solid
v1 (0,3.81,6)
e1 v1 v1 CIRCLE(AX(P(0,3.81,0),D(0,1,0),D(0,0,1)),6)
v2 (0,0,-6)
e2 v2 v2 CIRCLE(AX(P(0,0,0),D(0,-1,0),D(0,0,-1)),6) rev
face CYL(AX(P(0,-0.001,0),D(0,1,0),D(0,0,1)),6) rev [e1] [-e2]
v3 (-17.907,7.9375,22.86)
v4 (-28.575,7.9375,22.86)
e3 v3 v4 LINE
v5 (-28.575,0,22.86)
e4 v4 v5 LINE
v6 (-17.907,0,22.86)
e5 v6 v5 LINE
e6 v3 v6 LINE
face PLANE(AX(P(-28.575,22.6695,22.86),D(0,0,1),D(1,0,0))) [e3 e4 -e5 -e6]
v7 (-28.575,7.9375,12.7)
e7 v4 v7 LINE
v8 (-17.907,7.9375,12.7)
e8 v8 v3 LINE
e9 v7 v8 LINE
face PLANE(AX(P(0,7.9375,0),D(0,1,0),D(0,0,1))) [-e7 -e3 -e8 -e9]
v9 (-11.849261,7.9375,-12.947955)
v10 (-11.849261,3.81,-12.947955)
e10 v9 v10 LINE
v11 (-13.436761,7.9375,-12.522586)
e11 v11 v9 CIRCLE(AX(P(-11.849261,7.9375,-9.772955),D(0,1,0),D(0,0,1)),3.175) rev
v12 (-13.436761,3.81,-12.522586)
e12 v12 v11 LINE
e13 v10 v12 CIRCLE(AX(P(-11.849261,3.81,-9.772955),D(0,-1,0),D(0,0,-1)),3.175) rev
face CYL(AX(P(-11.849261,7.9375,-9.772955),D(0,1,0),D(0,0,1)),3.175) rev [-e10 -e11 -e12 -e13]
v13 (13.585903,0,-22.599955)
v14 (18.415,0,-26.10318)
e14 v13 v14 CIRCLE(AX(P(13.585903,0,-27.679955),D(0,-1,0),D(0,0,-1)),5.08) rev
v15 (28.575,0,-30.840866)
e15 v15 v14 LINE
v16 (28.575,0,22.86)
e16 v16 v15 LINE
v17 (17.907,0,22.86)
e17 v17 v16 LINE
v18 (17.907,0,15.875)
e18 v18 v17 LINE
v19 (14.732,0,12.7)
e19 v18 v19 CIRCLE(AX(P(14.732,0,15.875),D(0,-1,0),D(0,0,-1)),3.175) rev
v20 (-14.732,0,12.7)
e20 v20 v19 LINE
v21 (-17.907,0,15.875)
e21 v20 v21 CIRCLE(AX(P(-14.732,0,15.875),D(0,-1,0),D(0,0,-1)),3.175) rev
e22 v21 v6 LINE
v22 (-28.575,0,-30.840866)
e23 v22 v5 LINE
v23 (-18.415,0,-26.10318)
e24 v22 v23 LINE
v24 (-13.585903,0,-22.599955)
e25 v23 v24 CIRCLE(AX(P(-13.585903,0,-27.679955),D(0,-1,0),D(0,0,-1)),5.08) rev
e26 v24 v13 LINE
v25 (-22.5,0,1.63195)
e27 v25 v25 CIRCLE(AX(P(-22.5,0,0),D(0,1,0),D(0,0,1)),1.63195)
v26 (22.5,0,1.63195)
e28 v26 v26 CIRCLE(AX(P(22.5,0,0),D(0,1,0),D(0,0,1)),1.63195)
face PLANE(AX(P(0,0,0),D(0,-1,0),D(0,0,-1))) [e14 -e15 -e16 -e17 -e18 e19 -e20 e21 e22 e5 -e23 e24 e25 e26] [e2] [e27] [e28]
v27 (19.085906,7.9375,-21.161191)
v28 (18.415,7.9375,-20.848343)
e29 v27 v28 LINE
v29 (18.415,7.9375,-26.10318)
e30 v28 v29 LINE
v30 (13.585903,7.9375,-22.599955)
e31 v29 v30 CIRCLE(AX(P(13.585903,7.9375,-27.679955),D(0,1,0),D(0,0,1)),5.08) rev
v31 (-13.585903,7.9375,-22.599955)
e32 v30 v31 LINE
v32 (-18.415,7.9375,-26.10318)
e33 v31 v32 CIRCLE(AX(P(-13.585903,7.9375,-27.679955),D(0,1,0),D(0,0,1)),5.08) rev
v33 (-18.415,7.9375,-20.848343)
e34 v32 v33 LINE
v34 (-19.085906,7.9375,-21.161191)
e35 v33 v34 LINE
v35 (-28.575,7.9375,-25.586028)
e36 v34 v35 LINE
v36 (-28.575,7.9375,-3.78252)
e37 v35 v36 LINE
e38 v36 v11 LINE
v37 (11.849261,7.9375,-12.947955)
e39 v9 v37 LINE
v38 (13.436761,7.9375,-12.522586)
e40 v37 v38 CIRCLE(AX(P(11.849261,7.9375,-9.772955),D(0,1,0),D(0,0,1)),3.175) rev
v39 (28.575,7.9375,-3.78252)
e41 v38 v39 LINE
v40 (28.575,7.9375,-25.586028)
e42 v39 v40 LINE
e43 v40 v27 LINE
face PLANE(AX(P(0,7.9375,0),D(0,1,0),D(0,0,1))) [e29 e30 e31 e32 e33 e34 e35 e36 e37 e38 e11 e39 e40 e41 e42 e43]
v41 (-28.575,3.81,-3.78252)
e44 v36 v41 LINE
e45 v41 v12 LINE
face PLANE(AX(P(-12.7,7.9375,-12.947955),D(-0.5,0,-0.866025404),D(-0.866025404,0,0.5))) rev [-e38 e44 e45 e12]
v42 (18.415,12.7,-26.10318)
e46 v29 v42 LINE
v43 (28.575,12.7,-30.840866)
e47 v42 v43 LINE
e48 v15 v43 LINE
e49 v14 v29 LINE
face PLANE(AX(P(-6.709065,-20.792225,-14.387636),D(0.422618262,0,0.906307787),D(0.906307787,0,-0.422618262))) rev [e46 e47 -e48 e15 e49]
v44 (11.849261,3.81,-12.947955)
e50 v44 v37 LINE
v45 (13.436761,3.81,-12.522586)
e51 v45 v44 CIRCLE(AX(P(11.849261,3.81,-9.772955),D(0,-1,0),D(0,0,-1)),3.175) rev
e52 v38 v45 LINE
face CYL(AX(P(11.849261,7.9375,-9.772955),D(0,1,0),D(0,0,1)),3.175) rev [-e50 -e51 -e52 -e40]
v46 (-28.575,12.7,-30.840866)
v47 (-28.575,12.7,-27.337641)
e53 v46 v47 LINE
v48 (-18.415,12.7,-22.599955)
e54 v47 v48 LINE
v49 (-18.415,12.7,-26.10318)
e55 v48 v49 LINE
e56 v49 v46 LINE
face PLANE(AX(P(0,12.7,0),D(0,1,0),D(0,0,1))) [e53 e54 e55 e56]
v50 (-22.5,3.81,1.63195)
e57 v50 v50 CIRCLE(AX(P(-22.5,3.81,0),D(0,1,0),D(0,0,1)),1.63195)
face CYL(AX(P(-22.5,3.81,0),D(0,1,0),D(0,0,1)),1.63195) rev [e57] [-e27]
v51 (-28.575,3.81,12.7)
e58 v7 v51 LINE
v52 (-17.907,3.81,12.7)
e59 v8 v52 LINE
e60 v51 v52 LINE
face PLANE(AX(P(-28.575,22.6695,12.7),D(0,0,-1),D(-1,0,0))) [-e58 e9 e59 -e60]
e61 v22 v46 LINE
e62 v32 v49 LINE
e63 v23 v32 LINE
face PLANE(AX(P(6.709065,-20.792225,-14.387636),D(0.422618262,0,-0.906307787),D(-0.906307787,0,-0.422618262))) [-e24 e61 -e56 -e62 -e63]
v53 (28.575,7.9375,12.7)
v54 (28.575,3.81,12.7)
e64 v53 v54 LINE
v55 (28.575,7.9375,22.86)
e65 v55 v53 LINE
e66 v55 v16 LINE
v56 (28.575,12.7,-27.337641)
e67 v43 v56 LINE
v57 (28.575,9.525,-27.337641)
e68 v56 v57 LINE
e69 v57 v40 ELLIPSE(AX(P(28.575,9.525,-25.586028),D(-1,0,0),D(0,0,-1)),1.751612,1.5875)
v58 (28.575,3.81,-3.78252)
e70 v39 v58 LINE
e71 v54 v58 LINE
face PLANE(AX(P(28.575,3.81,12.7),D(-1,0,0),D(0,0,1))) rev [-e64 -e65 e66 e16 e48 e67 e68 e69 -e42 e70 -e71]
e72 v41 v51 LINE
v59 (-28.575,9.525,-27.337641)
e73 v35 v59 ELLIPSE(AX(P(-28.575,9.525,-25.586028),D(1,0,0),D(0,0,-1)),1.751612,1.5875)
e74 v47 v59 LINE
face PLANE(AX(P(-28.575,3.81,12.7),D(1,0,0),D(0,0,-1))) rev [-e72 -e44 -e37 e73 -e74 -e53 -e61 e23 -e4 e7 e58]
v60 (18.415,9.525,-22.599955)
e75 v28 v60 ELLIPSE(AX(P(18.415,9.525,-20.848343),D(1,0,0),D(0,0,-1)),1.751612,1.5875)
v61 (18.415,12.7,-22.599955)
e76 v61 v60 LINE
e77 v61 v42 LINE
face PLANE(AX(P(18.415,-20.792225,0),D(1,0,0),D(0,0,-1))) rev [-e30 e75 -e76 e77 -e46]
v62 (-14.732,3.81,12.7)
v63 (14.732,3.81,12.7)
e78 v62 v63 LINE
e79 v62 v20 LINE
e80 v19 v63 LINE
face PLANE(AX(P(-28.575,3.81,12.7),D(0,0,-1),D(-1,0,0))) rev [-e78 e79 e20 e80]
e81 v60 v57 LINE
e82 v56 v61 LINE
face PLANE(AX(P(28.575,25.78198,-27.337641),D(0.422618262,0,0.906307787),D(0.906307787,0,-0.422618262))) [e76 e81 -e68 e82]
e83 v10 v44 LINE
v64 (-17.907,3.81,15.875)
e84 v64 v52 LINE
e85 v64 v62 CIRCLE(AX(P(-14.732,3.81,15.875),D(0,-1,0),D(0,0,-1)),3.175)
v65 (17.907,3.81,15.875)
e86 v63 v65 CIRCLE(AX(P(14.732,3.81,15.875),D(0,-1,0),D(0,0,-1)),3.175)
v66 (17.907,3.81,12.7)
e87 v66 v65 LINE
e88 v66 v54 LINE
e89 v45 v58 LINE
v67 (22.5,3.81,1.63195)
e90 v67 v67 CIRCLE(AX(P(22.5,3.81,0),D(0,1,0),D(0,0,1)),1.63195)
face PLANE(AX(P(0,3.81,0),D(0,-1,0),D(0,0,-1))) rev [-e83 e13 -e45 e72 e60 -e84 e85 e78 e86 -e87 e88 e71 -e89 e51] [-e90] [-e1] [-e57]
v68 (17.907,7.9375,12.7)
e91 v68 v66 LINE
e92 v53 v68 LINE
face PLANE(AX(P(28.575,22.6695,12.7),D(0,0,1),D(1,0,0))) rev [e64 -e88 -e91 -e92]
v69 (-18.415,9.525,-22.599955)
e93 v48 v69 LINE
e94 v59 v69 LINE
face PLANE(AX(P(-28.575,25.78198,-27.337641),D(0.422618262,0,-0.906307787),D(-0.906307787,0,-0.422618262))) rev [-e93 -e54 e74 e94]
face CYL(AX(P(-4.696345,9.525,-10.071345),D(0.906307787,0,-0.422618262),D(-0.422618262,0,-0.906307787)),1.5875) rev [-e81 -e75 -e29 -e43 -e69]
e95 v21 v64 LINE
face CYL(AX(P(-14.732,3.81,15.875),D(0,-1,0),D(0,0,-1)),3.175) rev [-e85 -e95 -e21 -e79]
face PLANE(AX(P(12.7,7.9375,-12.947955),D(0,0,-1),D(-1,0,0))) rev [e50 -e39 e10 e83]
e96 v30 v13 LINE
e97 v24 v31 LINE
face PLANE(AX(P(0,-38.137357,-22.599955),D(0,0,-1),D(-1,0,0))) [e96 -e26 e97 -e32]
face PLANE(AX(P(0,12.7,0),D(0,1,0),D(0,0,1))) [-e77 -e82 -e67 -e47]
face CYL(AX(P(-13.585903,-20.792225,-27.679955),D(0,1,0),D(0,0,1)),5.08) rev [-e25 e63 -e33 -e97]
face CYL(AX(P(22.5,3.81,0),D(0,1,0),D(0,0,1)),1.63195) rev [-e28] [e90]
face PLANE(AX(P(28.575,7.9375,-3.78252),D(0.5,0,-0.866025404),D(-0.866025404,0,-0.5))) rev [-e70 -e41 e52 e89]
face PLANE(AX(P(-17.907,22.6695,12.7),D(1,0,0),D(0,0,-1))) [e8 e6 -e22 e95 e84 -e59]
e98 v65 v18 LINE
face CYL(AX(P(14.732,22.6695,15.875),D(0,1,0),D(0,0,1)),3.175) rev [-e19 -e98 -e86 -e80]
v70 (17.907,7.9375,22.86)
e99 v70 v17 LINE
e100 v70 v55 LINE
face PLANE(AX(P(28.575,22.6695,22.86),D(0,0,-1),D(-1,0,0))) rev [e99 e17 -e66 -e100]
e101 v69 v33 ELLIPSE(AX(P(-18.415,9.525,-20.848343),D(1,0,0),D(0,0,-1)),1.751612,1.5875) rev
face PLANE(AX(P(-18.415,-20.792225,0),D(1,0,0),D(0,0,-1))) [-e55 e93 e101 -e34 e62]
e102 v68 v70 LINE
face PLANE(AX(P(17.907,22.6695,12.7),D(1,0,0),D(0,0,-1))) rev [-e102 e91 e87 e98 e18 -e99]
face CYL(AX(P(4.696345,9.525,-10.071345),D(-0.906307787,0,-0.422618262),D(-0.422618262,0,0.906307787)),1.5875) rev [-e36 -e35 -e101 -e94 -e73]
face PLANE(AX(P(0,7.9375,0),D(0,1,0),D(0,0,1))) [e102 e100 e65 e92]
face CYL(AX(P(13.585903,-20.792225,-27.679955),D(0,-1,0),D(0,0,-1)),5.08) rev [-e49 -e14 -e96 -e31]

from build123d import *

# Parameters (mm, degrees)
SKETCH1_W             = 57.15
SKETCH1_H             = 25.4
BOSS_EXTRUDE1_DEPTH   = 3.81
CUT_EXTRUDE1_REACH    = 33.501
SKETCH2_R             = 6
F_4_CLEARANCE_HOLE1_D = 3.2639
BOSS_EXTRUDE4_DEPTH   = 3.81
BOSS_EXTRUDE5_DEPTH   = 8.89
SKETCH12_W            = 36.83
SKETCH12_H            = 9.899955096
BOSS_EXTRUDE6_DEPTH   = 3.81
BOSS_EXTRUDE7_DEPTH   = 4.1275
FILLET4_R             = 3.175
FILLET5_R             = 1.5875
BOSS_EXTRUDE8_REACH   = 45.92
SKETCH14_W            = 10.668
SKETCH14_H            = 10.16
FILLET6_R             = 3.175
FILLET7_R             = 5.08


with BuildPart() as part:
    # Sketch1 → Boss-Extrude1 (new body)
    with BuildSketch(Plane(origin=(0, 0, 0), x_dir=(1, 0, 0), z_dir=(0, 1, 0))):
        Rectangle(SKETCH1_W, SKETCH1_H)
    extrude(amount=BOSS_EXTRUDE1_DEPTH)

    # Sketch2 → Cut-Extrude1 (cut, up to next)
    with BuildSketch(Plane(origin=(0, 3.81, 0), x_dir=(1, 0, 0), z_dir=(0, 1, 0)), mode=Mode.PRIVATE) as cut_extrude1_sk1:
        with Locations(Location((0, 0, 0), (0, 0, 270))):
            Circle(SKETCH2_R)
    cut_extrude1_tool1 = extrude(cut_extrude1_sk1.sketch, amount=-CUT_EXTRUDE1_REACH, mode=Mode.PRIVATE) & part.part
    add(cut_extrude1_tool1.solids().sort_by_distance((0, 3.81, 0))[0], mode=Mode.SUBTRACT)

    # #4 Clearance Hole1 (through all)
    with Locations(Plane(origin=(0, 3.81, 0), x_dir=(1, 0, 0), z_dir=(0, 1, 0))):
        with Locations((-22.5, 0), (22.5, 0)):
            Hole(F_4_CLEARANCE_HOLE1_D / 2)

    # Sketch8 → Boss-Extrude4 (add)
    with BuildSketch(Plane(origin=(0, 3.81, 0), x_dir=(1, 0, 0), z_dir=(0, 1, 0))):
        Polygon((-28.575, 30.840865795), (-28.575, 12.7), (-18.415, 12.7), (-18.415, 26.103179988), align=None)
    boss_extrude4 = extrude(amount=-BOSS_EXTRUDE4_DEPTH)

    # Mirror4: Boss-Extrude4 across plane
    add(boss_extrude4.mirror(Plane(origin=(0, 0, 0), x_dir=(0, 0, 1), z_dir=(1, 0, 0))))

    # Sketch11 → Boss-Extrude5 (add)
    with BuildSketch(Plane(origin=(0, 3.81, 0), x_dir=(1, 0, 0), z_dir=(0, 1, 0))):
        Polygon((-18.415, 26.103179988), (-28.575, 30.840865795), (-28.575, 27.337640903), (-18.415, 22.599955096), align=None)
    boss_extrude5 = extrude(amount=BOSS_EXTRUDE5_DEPTH)

    # Mirror7: Boss-Extrude5 across plane
    add(boss_extrude5.mirror(Plane(origin=(0, 0, 0), x_dir=(0, 0, 1), z_dir=(1, 0, 0))))

    # Sketch12 → Boss-Extrude6 (add)
    with BuildSketch(Plane(origin=(0, 3.81, 0), x_dir=(1, 0, 0), z_dir=(0, 1, 0))):
        with Locations((0, 17.649977548)):
            Rectangle(SKETCH12_W, SKETCH12_H)
    extrude(amount=-BOSS_EXTRUDE6_DEPTH)

    # Sketch13 → Boss-Extrude7 (add)
    with BuildSketch(Plane(origin=(0, 3.81, 0), x_dir=(1, 0, 0), z_dir=(0, 1, 0))):
        Polygon((12.7, 12.947955096), (-12.7, 12.947955096), (-28.575, 3.782519572), (-28.575, 27.337640903), (-18.415, 22.599955096), (18.415, 22.599955096), (28.575, 27.337640903), (28.575, 3.782519572), align=None)
    extrude(amount=BOSS_EXTRUDE7_DEPTH)

    # Fillet4
    fillet4_edges = [part.edges().sort_by_distance(p)[0] for p in [
        (-12.7, 5.87375, -12.947955096),
        (12.7, 5.87375, -12.947955096),
    ]]
    fillet(fillet4_edges, radius=FILLET4_R)

    # Fillet5
    fillet5_edges = [part.edges().sort_by_distance(p)[0] for p in [
        (23.495, 7.9375, -24.968797999),
        (-23.495, 7.9375, -24.968797999),
    ]]
    fillet(fillet5_edges, radius=FILLET5_R)

    # Boss-Extrude8: up to this face of the body (flat: up to its plane)
    boss_extrude8_end = Plane(part.part.faces().sort_by_distance((0, 7.9375, -16.275006061))[0])
    # Sketch14 → Boss-Extrude8 (add, up to the picked face)
    with BuildSketch(Plane(origin=(0, 0, 0), x_dir=(1, 0, 0), z_dir=(0, 1, 0)), mode=Mode.PRIVATE) as boss_extrude8_sk1:
        with Locations((23.241, -17.78)):
            Rectangle(SKETCH14_W, SKETCH14_H)
    boss_extrude8_tool1 = split(extrude(boss_extrude8_sk1.sketch, amount=BOSS_EXTRUDE8_REACH, mode=Mode.PRIVATE), bisect_by=boss_extrude8_end, keep=Keep.BOTH, mode=Mode.PRIVATE)
    boss_extrude8 = boss_extrude8_tool1.solids().sort_by(Axis((23.241, 0, 17.78), (0, 1, 0)))[0]
    add(boss_extrude8)

    # Mirror9: Boss-Extrude8 across plane
    add(boss_extrude8.mirror(Plane(origin=(0, 0, 0), x_dir=(0, 0, 1), z_dir=(1, 0, 0))))

    # Fillet6
    fillet6_edges = [part.edges().sort_by_distance(p)[0] for p in [
        (17.907, 1.905, 12.7),
        (-17.907, 1.905, 12.7),
    ]]
    fillet(fillet6_edges, radius=FILLET6_R)

    # Fillet7
    # the kernel refuses this fillet: 5.08 mm, written as the material it adds along each edge
    with BuildSketch(Plane(origin=(-18.415, 0, -22.599955096), x_dir=(0, 0, -1), z_dir=(0, 1, 0))) as fillet7_piece_1:
        with BuildLine():
            CenterArc((5.08, -4.829097251), FILLET7_R, 108.082662978, 71.917337022)
            Line((0, -4.829097251), (-0.1016, -4.829097251))
            Line((-0.1016, -4.829097251), (-0.1016, 0))
            Line((-0.1016, 0), (0, 0.1016))
            ThreePointArc((0, 0.1016), (1.751612446, 0.1016), (3.471689391, 0.096581945))
            Line((3.471689391, 0.096581945), (3.503224893, 0))
        make_face()
    extrude(amount=7.9375)
    with BuildSketch(Plane(origin=(18.415, 0, -22.599955096), x_dir=(0, 0, -1), z_dir=(0, 1, 0))) as fillet7_piece_2:
        with BuildLine():
            CenterArc((5.08, 4.829097251), FILLET7_R, 180, 71.917337022)
            Line((0, 4.829097251), (-0.1016, 4.829097251))
            Line((-0.1016, 4.829097251), (-0.1016, 0))
            Line((-0.1016, 0), (0, -0.1016))
            ThreePointArc((0, -0.1016), (1.751612446, -0.1016), (3.471689391, -0.096581945))
            Line((3.471689391, -0.096581945), (3.503224893, 0))
        make_face()
    extrude(amount=7.9375)


solid = part.part
